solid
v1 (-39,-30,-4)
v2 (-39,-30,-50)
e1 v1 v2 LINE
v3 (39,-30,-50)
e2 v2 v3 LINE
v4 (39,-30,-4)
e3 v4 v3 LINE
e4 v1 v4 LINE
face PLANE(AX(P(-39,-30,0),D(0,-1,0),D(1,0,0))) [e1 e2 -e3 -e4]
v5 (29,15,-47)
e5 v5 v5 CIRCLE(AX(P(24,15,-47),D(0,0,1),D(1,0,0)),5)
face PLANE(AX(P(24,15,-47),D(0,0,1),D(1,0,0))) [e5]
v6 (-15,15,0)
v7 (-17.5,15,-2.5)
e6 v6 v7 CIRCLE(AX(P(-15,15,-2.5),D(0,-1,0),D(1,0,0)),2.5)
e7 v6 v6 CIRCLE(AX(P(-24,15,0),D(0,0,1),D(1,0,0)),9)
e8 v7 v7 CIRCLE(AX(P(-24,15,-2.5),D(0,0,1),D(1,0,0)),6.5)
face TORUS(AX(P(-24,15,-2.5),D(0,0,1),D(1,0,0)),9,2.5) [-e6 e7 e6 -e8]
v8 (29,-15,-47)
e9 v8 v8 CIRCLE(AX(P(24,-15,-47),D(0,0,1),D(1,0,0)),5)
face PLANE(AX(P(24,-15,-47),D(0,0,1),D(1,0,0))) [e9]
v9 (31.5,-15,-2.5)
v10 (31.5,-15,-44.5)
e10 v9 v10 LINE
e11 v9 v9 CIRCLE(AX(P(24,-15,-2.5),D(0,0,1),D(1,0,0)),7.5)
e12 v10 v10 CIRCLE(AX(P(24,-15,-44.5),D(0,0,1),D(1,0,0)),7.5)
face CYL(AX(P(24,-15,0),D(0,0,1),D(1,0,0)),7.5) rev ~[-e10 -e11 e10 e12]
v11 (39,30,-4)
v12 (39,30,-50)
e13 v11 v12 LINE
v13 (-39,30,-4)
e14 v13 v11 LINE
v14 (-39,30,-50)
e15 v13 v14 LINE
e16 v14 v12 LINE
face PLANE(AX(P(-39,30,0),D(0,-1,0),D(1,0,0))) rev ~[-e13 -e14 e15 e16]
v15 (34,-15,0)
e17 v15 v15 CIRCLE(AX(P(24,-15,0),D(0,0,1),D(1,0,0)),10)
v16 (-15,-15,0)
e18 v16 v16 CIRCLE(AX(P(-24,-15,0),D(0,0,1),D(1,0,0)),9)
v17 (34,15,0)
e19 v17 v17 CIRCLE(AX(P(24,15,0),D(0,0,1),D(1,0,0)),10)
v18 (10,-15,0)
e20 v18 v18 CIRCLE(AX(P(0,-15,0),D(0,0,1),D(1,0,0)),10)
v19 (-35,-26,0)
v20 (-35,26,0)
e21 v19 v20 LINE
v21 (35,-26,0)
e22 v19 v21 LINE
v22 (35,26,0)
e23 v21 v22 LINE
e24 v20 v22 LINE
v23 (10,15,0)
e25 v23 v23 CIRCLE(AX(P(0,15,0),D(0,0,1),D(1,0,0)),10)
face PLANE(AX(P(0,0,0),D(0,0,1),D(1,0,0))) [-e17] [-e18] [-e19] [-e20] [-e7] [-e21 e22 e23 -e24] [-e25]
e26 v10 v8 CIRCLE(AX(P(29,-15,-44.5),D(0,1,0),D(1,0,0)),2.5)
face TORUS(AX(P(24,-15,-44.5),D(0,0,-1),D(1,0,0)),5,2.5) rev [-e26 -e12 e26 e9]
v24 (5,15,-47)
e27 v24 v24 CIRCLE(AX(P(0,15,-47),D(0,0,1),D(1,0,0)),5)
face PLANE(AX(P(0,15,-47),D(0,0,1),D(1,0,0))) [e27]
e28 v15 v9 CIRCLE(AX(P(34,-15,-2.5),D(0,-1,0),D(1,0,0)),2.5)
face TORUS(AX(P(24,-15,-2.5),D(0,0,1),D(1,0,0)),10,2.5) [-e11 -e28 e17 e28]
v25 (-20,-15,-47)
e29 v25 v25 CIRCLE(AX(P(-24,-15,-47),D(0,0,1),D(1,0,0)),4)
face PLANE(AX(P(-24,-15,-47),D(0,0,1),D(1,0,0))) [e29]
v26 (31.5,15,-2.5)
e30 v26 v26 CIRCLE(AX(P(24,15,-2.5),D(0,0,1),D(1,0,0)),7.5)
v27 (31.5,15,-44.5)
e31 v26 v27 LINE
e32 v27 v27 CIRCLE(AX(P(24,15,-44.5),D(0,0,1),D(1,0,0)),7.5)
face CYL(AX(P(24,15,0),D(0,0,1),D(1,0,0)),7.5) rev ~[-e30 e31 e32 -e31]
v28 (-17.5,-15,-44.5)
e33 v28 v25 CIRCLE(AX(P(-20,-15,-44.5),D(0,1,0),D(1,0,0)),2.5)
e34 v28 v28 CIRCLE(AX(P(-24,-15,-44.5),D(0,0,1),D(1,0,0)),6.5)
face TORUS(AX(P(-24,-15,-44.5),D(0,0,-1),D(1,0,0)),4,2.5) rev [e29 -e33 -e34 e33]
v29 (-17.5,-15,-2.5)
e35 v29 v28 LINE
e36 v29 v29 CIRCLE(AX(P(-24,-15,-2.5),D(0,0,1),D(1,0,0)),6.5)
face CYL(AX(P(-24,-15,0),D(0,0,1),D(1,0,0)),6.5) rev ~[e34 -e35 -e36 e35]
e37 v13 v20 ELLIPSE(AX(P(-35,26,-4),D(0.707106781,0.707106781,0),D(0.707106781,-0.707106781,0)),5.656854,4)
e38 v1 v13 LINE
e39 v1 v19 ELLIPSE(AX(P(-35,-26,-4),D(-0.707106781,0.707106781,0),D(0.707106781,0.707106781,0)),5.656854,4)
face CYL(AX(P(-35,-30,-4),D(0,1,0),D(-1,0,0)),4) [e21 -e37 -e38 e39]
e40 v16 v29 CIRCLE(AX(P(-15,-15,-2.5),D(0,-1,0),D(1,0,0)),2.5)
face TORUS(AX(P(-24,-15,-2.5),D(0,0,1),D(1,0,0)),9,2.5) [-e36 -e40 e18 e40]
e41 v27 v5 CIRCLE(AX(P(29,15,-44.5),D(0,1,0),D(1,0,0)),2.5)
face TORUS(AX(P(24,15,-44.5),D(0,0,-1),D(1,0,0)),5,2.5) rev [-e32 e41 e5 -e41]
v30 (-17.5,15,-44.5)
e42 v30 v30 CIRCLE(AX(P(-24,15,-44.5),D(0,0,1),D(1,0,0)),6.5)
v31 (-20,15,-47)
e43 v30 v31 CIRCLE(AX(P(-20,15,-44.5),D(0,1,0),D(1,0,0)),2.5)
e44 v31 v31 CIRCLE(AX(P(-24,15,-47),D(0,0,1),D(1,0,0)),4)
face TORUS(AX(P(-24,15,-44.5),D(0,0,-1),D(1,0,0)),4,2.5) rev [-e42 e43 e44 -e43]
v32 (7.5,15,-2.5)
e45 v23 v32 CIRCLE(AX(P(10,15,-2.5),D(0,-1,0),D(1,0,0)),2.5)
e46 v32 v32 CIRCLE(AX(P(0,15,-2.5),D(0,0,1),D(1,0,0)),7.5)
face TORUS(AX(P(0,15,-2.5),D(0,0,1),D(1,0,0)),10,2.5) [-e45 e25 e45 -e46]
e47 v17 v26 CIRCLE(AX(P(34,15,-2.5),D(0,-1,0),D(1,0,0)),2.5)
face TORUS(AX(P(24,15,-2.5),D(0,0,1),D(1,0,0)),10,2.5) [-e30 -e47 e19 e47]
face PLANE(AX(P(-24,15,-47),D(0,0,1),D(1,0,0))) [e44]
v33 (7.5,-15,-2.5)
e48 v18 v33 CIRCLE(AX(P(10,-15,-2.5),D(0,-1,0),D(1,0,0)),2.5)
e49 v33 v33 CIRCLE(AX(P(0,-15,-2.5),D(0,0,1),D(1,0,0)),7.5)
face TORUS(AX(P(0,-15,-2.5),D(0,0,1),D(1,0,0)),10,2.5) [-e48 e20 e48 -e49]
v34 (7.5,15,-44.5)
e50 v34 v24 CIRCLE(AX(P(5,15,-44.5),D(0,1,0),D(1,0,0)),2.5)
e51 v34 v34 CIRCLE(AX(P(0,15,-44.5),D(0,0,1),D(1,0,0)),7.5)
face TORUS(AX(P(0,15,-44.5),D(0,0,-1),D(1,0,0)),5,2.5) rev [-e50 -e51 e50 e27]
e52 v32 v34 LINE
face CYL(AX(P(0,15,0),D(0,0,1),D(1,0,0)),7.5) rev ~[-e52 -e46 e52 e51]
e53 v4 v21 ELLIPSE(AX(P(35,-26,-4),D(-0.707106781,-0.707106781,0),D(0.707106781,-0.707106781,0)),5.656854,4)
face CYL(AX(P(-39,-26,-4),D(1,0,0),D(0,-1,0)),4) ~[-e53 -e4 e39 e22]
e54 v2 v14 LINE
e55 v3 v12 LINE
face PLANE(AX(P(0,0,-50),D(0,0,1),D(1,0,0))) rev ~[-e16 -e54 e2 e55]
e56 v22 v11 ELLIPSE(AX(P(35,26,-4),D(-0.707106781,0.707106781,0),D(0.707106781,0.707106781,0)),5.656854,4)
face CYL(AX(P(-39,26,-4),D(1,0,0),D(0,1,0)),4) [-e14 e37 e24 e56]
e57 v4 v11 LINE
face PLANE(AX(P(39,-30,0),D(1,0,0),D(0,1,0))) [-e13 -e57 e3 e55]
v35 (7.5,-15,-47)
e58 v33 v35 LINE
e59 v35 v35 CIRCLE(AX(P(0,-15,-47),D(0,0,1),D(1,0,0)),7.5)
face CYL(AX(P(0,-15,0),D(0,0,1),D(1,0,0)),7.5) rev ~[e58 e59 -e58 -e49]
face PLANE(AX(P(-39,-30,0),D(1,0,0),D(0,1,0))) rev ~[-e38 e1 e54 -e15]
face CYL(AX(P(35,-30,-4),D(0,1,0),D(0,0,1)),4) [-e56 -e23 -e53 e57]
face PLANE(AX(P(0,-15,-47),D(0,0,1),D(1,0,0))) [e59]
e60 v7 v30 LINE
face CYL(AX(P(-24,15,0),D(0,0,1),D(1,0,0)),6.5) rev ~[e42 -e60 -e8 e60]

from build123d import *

# Parameters (mm, degrees)
F0_W     = 78
F0_H     = 60
F0_R     = 7.5
F0_R_2   = 6.5
F1_DEPTH = 50
F2_DEPTH = 47
F3_R     = 4
F4_R     = 2.5


# Not quite as in the source:
# - a feature names something its author has since deleted; it is built from what else it names


with BuildPart() as f1:
    # F0 (on Top) → F1 (new body)
    with BuildSketch(Plane.XY):
        Rectangle(F0_W, F0_H)
        with Locations((-24, -15)):
            Circle(F0_R, mode=Mode.SUBTRACT)
        with Locations((0, -15)):
            Circle(F0_R, mode=Mode.SUBTRACT)
        with Locations((24, -15)):
            Circle(F0_R, mode=Mode.SUBTRACT)
        with Locations((-24, 15)):
            Circle(F0_R, mode=Mode.SUBTRACT)
        with Locations((0, 15)):
            Circle(F0_R, mode=Mode.SUBTRACT)
        with Locations((24, 15)):
            Circle(F0_R, mode=Mode.SUBTRACT)
        with Locations((-24, 15)):
            Circle(F0_R)
        with Locations((-24, 15)):
            Circle(F0_R_2, mode=Mode.SUBTRACT)
        with Locations((-24, -15)):
            Circle(F0_R)
        with Locations((-24, -15)):
            Circle(F0_R_2, mode=Mode.SUBTRACT)
        with Locations((0, 15)):
            Circle(F0_R)
        with Locations((24, 15)):
            Circle(F0_R)
        with Locations((24, -15)):
            Circle(F0_R)
        with Locations((0, -15)):
            Circle(F0_R)
        with Locations((-24, 15)):
            Circle(F0_R_2)
        with Locations((-24, -15)):
            Circle(F0_R_2)
    extrude(amount=-F1_DEPTH)

    # F0 (on Top) → F2 (cut)
    with BuildSketch(Plane.XY):
        with Locations((-24, -15)):
            Circle(F0_R_2)
        with Locations((-24, 15)):
            Circle(F0_R_2)
        with Locations((0, 15)):
            Circle(F0_R)
        with Locations((24, -15)):
            Circle(F0_R)
        with Locations((24, 15)):
            Circle(F0_R)
        with Locations((0, -15)):
            Circle(F0_R)
    extrude(amount=-F2_DEPTH, mode=Mode.SUBTRACT)

    # F3
    f3_edges = [f1.edges().sort_by_distance(p)[0] for p in [
        (0, -30, 0),
        (39, 0, 0),
        (0, 30, 0),
        (-39, 0, 0),
    ]]
    fillet(f3_edges, radius=F3_R)

    # F4
    f4_edges = [f1.edges().sort_by_distance(p)[0] for p in [
        (16.5, -15, 0),
        (-7.5, 15, 0),
        (16.5, 15, 0),
        (-30.5, 15, 0),
        (-30.5, -15, 0),
        (16.5, -15, -47),
        (16.5, 15, -47),
        (-30.5, 15, -47),
        (-7.5, 15, -47),
        (-30.5, -15, -47),
        (-7.5, -15, 0),
    ]]
    fillet(f4_edges, radius=F4_R)


solid = f1.part
